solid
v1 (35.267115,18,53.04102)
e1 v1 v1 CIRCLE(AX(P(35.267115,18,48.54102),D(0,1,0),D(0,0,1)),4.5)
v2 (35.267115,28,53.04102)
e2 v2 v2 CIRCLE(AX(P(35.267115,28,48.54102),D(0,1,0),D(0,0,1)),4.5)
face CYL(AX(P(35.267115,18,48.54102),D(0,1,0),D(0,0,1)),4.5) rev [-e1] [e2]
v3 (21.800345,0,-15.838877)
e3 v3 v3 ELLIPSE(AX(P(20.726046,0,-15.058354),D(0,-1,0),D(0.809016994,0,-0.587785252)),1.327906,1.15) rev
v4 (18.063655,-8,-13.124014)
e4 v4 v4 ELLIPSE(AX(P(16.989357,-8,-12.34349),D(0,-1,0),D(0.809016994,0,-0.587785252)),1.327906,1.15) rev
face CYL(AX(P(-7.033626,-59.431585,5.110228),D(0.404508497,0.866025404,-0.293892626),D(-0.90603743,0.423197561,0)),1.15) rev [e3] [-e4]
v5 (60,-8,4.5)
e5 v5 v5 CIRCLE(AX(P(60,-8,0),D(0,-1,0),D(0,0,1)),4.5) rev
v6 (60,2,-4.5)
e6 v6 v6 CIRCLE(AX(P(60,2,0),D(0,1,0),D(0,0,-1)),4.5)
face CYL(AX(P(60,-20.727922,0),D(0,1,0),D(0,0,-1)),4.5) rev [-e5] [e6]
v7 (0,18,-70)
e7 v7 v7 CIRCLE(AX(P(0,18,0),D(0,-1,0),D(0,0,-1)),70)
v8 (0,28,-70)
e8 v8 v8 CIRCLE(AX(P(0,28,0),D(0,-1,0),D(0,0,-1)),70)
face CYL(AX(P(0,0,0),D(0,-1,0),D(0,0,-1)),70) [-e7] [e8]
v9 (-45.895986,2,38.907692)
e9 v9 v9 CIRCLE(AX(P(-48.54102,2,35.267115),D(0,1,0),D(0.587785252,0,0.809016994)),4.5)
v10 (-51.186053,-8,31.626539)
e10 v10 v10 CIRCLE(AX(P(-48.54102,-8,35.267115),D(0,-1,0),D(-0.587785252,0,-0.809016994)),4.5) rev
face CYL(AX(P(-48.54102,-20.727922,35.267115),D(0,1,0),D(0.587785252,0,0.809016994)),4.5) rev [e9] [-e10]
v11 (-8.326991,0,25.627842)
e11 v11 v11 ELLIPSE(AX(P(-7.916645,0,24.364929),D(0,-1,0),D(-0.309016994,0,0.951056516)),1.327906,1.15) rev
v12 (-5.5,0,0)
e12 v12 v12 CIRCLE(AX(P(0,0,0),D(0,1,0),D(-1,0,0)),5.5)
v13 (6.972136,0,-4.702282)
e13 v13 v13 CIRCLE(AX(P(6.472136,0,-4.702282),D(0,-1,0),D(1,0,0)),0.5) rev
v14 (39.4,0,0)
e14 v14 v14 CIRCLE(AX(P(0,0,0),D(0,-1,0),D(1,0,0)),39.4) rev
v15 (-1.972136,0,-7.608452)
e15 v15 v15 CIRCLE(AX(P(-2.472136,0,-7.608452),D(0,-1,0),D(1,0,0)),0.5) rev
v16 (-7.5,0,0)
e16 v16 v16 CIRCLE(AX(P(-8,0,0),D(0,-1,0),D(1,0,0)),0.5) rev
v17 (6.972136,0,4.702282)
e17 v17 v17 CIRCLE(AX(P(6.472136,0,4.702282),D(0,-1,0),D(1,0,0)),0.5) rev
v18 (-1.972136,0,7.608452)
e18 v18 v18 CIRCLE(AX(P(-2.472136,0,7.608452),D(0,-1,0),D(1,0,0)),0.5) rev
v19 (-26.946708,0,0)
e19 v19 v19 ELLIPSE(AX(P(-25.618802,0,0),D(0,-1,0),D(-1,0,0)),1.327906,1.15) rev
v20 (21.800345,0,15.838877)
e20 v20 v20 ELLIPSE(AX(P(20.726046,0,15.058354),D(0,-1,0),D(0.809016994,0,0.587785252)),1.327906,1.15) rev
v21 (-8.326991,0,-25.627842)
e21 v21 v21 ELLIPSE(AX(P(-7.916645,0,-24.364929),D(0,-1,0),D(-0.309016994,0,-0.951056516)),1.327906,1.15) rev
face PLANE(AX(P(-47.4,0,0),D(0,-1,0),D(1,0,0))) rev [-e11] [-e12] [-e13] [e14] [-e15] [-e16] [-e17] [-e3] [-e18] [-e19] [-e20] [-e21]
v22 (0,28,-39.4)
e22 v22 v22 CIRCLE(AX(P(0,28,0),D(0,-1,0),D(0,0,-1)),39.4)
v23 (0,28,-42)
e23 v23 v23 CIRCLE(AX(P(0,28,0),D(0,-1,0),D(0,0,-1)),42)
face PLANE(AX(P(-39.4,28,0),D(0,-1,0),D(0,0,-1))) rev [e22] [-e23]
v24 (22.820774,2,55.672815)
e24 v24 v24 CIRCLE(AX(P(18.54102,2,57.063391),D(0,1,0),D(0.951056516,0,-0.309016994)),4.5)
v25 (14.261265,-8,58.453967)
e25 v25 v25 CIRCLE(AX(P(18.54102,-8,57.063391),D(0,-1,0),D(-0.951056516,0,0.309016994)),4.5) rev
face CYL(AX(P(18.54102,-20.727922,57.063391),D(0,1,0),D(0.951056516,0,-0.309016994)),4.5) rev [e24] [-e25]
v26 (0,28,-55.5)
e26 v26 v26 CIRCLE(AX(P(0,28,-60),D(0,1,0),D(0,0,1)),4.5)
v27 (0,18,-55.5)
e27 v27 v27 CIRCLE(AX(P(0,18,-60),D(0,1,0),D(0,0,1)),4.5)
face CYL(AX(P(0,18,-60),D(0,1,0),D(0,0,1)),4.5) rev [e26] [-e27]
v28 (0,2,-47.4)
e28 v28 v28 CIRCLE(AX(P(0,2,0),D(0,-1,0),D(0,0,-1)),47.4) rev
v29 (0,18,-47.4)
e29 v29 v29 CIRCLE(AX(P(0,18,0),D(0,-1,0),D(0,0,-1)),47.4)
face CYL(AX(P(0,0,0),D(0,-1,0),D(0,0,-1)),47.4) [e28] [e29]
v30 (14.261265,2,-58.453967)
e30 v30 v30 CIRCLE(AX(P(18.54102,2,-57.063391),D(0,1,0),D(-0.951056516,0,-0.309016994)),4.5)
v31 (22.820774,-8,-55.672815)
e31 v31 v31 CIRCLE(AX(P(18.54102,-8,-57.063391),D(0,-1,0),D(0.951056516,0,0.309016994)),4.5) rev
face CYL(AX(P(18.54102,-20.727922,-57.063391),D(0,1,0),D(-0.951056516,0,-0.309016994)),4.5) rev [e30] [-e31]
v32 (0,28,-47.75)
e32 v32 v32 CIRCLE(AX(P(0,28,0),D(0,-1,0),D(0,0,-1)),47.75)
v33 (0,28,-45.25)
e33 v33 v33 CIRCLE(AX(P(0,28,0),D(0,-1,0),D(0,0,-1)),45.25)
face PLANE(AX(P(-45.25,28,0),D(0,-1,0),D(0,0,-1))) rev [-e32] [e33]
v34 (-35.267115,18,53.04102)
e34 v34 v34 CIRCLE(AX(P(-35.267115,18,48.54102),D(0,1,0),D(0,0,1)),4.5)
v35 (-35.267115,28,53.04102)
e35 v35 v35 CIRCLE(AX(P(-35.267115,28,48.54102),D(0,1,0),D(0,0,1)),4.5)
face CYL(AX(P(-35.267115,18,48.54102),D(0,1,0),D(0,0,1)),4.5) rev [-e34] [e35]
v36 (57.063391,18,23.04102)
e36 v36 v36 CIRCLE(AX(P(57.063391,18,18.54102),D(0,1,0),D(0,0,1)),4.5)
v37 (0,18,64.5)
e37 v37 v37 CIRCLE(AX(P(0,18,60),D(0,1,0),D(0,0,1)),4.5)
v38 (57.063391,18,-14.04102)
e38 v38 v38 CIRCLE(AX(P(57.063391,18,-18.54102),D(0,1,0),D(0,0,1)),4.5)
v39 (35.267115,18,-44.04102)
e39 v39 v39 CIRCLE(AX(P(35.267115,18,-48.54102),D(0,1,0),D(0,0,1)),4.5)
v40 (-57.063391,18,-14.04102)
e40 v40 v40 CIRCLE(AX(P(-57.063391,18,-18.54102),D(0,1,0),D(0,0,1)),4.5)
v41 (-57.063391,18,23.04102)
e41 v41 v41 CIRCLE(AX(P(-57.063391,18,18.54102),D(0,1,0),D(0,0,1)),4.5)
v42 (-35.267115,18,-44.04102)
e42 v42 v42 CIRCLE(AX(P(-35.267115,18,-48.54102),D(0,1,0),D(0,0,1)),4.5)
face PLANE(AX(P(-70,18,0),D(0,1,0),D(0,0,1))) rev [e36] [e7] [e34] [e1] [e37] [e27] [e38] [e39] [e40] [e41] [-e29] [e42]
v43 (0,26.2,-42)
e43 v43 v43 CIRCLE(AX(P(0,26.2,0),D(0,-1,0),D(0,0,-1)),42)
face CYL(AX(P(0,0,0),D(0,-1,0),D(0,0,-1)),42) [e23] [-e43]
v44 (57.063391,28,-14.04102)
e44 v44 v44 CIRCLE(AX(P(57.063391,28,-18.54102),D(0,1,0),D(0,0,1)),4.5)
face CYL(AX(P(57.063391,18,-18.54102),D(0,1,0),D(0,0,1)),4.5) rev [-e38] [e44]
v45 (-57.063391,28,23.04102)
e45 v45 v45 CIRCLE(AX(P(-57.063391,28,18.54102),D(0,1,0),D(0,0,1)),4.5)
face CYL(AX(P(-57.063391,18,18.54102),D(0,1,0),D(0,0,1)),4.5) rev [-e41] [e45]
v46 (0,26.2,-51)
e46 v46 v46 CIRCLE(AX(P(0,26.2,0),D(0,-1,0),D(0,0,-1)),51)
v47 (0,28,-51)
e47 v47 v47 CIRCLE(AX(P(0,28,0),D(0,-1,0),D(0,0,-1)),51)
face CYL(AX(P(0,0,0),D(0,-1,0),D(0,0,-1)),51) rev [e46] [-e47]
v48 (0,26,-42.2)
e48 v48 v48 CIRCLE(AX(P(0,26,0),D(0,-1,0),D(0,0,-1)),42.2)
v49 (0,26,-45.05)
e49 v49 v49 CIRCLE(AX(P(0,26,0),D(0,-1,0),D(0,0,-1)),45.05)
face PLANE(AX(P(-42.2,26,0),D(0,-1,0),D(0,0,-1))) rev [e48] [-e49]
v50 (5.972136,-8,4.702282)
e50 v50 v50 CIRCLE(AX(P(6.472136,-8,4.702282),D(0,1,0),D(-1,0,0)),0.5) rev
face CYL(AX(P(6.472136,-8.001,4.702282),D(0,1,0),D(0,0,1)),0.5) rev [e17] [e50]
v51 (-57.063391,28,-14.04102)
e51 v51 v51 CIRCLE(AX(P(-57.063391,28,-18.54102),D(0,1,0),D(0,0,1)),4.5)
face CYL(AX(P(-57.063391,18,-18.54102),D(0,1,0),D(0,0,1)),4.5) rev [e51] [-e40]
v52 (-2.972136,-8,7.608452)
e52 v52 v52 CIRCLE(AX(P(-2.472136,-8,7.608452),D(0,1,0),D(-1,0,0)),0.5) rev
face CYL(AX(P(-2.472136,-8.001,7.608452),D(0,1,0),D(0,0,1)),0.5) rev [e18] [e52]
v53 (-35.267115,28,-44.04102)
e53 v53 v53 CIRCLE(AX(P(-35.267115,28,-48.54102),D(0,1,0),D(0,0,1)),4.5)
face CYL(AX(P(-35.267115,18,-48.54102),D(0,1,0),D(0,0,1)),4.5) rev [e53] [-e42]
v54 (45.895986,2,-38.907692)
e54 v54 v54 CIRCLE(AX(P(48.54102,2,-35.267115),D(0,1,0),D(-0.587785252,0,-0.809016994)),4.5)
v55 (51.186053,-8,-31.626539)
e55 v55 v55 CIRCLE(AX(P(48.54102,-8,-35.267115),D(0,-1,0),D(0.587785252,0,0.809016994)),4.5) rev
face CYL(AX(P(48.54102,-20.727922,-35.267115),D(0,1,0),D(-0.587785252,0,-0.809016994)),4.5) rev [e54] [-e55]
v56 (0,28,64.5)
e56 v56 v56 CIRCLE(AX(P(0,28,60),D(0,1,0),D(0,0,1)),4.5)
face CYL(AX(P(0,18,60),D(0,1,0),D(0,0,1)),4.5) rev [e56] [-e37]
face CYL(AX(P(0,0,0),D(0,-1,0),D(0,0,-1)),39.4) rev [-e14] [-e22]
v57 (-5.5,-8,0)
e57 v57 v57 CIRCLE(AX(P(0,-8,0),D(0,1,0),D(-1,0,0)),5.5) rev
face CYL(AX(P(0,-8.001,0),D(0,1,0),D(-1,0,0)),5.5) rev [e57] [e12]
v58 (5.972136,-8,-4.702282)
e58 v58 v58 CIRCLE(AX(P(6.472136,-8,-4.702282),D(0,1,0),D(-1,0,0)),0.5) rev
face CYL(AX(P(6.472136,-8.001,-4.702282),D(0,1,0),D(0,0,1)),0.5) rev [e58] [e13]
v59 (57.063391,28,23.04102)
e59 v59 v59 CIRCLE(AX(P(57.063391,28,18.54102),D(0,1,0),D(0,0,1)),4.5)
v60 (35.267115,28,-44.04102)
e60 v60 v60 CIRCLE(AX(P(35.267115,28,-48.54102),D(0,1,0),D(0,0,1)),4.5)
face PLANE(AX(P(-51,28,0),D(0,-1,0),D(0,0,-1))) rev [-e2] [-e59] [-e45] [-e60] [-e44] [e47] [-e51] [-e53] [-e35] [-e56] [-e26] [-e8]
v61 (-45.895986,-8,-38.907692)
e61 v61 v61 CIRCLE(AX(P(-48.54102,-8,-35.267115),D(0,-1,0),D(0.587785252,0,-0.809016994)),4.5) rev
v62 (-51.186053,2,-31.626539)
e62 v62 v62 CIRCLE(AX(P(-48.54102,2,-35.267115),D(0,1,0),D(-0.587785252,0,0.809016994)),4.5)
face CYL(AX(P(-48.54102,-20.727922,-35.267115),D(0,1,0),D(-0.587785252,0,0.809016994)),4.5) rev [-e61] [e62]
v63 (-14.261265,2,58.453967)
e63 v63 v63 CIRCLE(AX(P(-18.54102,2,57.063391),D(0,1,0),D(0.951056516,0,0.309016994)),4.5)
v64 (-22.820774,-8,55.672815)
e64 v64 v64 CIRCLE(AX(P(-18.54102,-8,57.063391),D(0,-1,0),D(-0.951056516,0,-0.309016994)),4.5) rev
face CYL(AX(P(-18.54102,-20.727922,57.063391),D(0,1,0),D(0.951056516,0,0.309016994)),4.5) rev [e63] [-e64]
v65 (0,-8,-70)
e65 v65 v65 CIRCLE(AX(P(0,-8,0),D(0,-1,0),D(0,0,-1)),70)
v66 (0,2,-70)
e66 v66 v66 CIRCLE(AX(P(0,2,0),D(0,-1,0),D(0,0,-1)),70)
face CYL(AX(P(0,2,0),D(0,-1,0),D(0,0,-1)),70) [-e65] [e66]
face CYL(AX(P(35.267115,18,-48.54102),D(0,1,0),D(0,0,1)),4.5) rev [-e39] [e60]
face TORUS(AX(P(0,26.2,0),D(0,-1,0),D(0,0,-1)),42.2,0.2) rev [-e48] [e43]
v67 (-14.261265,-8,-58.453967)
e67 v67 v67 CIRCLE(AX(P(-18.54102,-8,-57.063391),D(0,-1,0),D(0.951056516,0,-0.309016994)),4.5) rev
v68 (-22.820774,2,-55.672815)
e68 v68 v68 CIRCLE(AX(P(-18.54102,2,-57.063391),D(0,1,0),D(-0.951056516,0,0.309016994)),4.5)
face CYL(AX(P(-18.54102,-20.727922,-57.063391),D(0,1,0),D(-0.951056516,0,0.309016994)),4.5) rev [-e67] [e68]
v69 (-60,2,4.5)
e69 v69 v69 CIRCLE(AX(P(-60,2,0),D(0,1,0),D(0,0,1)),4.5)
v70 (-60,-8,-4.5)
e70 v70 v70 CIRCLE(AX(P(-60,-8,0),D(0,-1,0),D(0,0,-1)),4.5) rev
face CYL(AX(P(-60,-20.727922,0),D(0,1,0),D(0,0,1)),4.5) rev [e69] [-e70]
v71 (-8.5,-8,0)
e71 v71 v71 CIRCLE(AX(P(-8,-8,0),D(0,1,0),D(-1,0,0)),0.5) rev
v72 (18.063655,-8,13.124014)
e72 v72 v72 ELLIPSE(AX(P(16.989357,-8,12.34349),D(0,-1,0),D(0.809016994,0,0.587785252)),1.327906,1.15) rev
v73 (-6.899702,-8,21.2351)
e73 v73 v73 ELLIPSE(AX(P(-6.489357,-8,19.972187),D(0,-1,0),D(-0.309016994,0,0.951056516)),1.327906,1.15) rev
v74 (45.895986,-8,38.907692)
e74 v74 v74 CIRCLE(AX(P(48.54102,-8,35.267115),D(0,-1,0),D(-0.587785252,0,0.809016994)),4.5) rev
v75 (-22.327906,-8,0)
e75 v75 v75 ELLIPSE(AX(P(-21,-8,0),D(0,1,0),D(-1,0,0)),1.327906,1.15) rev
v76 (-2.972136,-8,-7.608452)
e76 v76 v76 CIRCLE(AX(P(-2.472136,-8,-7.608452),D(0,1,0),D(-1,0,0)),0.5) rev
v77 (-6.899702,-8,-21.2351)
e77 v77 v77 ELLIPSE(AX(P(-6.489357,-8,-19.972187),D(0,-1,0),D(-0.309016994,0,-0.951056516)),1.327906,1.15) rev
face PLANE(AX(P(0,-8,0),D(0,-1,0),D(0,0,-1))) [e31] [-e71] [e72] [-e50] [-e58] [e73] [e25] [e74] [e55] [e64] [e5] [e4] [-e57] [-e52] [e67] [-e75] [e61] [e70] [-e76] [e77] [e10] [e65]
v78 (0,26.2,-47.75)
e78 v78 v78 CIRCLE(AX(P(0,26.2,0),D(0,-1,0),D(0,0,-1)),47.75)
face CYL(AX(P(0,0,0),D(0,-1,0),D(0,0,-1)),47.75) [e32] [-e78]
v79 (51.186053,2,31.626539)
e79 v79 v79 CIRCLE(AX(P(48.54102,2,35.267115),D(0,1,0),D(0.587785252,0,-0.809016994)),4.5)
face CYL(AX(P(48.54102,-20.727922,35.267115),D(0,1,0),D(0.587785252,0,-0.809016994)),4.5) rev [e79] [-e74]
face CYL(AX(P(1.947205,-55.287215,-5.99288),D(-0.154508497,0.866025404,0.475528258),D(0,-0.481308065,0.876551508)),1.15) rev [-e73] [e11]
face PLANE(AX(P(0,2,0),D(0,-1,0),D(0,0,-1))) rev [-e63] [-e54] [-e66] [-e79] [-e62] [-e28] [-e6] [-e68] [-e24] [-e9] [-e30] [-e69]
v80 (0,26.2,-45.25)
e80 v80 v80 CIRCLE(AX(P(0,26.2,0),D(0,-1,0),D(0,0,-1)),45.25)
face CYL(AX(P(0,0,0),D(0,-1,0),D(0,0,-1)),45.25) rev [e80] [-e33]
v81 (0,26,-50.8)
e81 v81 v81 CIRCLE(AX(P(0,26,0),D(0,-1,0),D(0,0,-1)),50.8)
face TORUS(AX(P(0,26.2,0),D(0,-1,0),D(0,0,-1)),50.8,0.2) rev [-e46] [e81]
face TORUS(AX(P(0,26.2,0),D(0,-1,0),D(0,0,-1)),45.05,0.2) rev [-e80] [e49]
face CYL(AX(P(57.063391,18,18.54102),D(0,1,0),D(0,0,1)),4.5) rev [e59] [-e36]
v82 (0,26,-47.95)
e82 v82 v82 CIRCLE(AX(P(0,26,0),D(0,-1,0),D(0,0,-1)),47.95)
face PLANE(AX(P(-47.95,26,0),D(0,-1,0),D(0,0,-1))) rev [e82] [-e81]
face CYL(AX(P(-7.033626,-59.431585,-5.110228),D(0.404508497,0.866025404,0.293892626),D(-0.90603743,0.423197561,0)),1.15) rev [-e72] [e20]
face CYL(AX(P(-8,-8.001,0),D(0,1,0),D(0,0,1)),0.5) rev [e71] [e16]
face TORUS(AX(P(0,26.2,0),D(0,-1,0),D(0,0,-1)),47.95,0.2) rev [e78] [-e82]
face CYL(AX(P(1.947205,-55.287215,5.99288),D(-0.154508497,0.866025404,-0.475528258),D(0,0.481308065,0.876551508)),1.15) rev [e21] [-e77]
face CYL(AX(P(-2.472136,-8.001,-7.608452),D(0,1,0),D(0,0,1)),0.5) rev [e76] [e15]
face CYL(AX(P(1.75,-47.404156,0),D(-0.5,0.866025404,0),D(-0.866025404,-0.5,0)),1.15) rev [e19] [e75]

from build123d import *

# Parameters (mm, degrees)
FUEL_START                = -8
SKETCH2_R                 = 0.5
FUEL_HOLES_DEPTH          = 8
CIRPATTERN1_COUNT         = 5
SKETCH19_R                = 70
SKETCH19_R_2              = 47.4
BOSS_EXTRUDE2_DEPTH       = 10
SKETCH19_3_R              = 4
BOLT_HOLES_DEPTH          = 10
CUT_EXTRUDE7_START        = -10
SKETCH41_R                = 1.15
CUT_EXTRUDE7_DEPTH        = 111.877528587
SKETCH32_R                = 5.5
CUT_EXTRUDE3_DEPTH        = 8
CIRPATTERN6_START         = -8
CIRPATTERN6_OUTLINE_R     = 4
CIRPATTERN6_DEPTH         = 10
CIRPATTERN6_2_OUTLINE_R   = 70
CIRPATTERN6_2_OUTLINE_R_2 = 47.4
CIRPATTERN6_2_DEPTH       = 10
SKETCH33_R                = 4.5
CUT_EXTRUDE5_DEPTH        = 10
CIRPATTERN8_COUNT         = 10
SKETCH36_R                = 4.5
CUT_EXTRUDE6_DEPTH        = 10
CIRPATTERN9_COUNT         = 5


# Read off the part's stored shape, not the designer's step: CirPattern6
with BuildPart() as part:
    # Sketch1 → Revolve1 (revolve)
    with BuildSketch(Plane.XY, mode=Mode.PRIVATE) as revolve1_sk:
        Polygon((-47.4, 0), (-47.4, -8), (-17.4, -8), (-7, -8), (0, -8), (0, 0), align=None)
    revolve(revolve1_sk.sketch.rotate(Axis((0, -8, 0), (0, 1, 0)), 180), axis=Axis((0, -8, 0), (0, 1, 0)))

    # Sketch2 → Fuel holes (cut)
    with BuildSketch(Plane(origin=(0, 0, 0), x_dir=(1, 0, 0), z_dir=(0, 1, 0)).offset(FUEL_START)):
        with Locations(Location((-8, 0, 0), (0, 0, 180))):
            Circle(SKETCH2_R)
    fuel_holes = extrude(amount=FUEL_HOLES_DEPTH, mode=Mode.SUBTRACT)

    # CirPattern1: Fuel holes ×5 about axis
    cirpattern1_axis = Axis((0, 0, 0), (0, 1, 0))
    for i in range(1, CIRPATTERN1_COUNT):
        add(fuel_holes.rotate(cirpattern1_axis, i * 360 / CIRPATTERN1_COUNT), mode=Mode.SUBTRACT)

    # Sketch41 → Cut-Extrude7 (cut)
    with BuildSketch(Plane(origin=(-1.785898385, 3.09326674, 0), x_dir=(0, 0, -1), z_dir=(0.499999999999998, -0.8660254037844398, 0)).offset(CUT_EXTRUDE7_START)):
        with Locations(Location((0, -22.186533479, 0), (0, 0, 270))):
            Circle(SKETCH41_R)
    cut_extrude7 = extrude(amount=CUT_EXTRUDE7_DEPTH, mode=Mode.SUBTRACT)

    # Sketch32 → Cut-Extrude3 (cut)
    with BuildSketch(Plane(origin=(0, 0, 0), x_dir=(1, 0, 0), z_dir=(0, 1, 0))):
        with Locations(Location((0, 0, 0), (0, 0, 180))):
            Circle(SKETCH32_R)
    extrude(amount=-CUT_EXTRUDE3_DEPTH, mode=Mode.SUBTRACT)

    # CirPattern6 2 outline → CirPattern6 2 (add)
    with BuildSketch(Plane(origin=(0, 0, 0), x_dir=(1, 0, 0), z_dir=(0, 1, 0)).offset(CIRPATTERN6_START)):
        Circle(CIRPATTERN6_2_OUTLINE_R)
        Circle(CIRPATTERN6_2_OUTLINE_R_2, mode=Mode.SUBTRACT)
    extrude(amount=CIRPATTERN6_2_DEPTH)


with BuildPart() as body_2:
    # Sketch19 → Boss-Extrude2 (new body)
    with BuildSketch(Plane.XZ.offset(8)):
        with Locations(Location((0, 0, 0), (0, 0, 270))):
            Circle(SKETCH19_R)
        with Locations(Location((0, 0, 0), (0, 0, 270))):
            Circle(SKETCH19_R_2, mode=Mode.SUBTRACT)
    extrude(amount=-BOSS_EXTRUDE2_DEPTH)

    # Sketch19<3> → Bolt holes (cut)
    with BuildSketch(Plane.XZ.offset(8)):
        with Locations(Location((-60, 0, 0), (0, 0, 270))):
            Circle(SKETCH19_3_R)
    extrude(amount=-BOLT_HOLES_DEPTH, mode=Mode.SUBTRACT)

    # CirPattern6 outline → CirPattern6 (add)
    with BuildSketch(Plane(origin=(0, 0, 0), x_dir=(1, 0, 0), z_dir=(0, 1, 0)).offset(CIRPATTERN6_START)):
        with Locations((-60, 0)):
            Circle(CIRPATTERN6_OUTLINE_R)
    extrude(amount=CIRPATTERN6_DEPTH)


with BuildPart() as cut_extrude5_tool:
    # Sketch33 → Cut-Extrude5 (new body)
    with BuildSketch(Plane(origin=(0, 2, 0), x_dir=(1, 0, 0), z_dir=(0, 1, 0))):
        with Locations(Location((-60, 0, 0), (0, 0, 270))):
            Circle(SKETCH33_R)
    cut_extrude5 = extrude(amount=-CUT_EXTRUDE5_DEPTH)


with BuildPart() as part_1:
    add(part.part)

    # Cut-Extrude5: cut by cut_extrude5_tool
    add(cut_extrude5_tool.part, mode=Mode.SUBTRACT)


with BuildPart() as body_2_1:
    add(body_2.part)

    # Cut-Extrude5: cut by cut_extrude5_tool
    add(cut_extrude5_tool.part, mode=Mode.SUBTRACT)


with BuildPart() as cirpattern8_tool:
    # CirPattern8: Cut-Extrude5 ×10 about axis
    cirpattern8_axis = Axis((0, 0, 0), (0, 1, 0))
    for i in range(1, CIRPATTERN8_COUNT):
        add(cut_extrude5.rotate(cirpattern8_axis, i * 360 / CIRPATTERN8_COUNT))


with BuildPart() as part_2:
    add(part_1.part)

    # CirPattern8: cut by cirpattern8_tool
    add(cirpattern8_tool.part, mode=Mode.SUBTRACT)



with BuildPart() as body_2_2:
    add(body_2_1.part)

    # CirPattern8: cut by cirpattern8_tool
    add(cirpattern8_tool.part, mode=Mode.SUBTRACT)


with BuildPart() as part_3:
    add(part_2.part)

    add(body_2_2.part)  # Revolve2 merges body 2
    # Sketch34 → Revolve2 (revolve)
    with BuildSketch(Plane.XY, mode=Mode.PRIVATE) as revolve2_sk:
        with BuildLine():
            Line((-47.4, 0), (-39.4, 0))
            Line((-39.4, 0), (-39.4, 28))
            Line((-39.4, 28), (-42, 28))
            Line((-42, 28), (-42, 26.2))
            ThreePointArc((-42, 26.2), (-42.058578644, 26.058578644), (-42.2, 26))
            Line((-42.2, 26), (-45.05, 26))
            ThreePointArc((-45.05, 26), (-45.191421356, 26.058578644), (-45.25, 26.2))
            Line((-45.25, 26.2), (-45.25, 28))
            Line((-45.25, 28), (-47.75, 28))
            Line((-47.75, 28), (-47.75, 26.2))
            ThreePointArc((-47.75, 26.2), (-47.808578644, 26.058578644), (-47.95, 26))
            Line((-47.95, 26), (-50.8, 26))
            ThreePointArc((-50.8, 26), (-50.941421356, 26.058578644), (-51, 26.2))
            Line((-51, 26.2), (-51, 28))
            Line((-51, 28), (-70, 28))
            Line((-70, 28), (-70, 18))
            Line((-70, 18), (-47.4, 18))
            Line((-47.4, 18), (-47.4, 0))
        make_face()
    revolve(revolve2_sk.sketch.rotate(Axis((0, 0, 0), (0, 1, 0)), 270), axis=Axis((0, 0, 0), (0, 1, 0)))

    # Sketch36 → Cut-Extrude6 (cut)
    with BuildSketch(Plane(origin=(0, 28, 0), x_dir=(1, 0, 0), z_dir=(0, 1, 0))):
        with Locations(Location((35.267115138, 48.541019663, 0), (0, 0, 270))):
            Circle(SKETCH36_R)
        with Locations(Location((-35.267115138, 48.541019662, 0), (0, 0, 270))):
            Circle(SKETCH36_R)
        with Locations(Location((0, 60, 0), (0, 0, 270))):
            Circle(SKETCH36_R)
        with Locations(Location((-57.063390978, 18.541019662, 0), (0, 0, 270))):
            Circle(SKETCH36_R)
        with Locations(Location((-57.063390978, -18.541019663, 0), (0, 0, 270))):
            Circle(SKETCH36_R)
        with Locations(Location((57.063390978, 18.541019663, 0), (0, 0, 270))):
            Circle(SKETCH36_R)
        with Locations(Location((57.063390978, -18.541019662, 0), (0, 0, 270))):
            Circle(SKETCH36_R)
        with Locations(Location((35.267115138, -48.541019662, 0), (0, 0, 270))):
            Circle(SKETCH36_R)
        with Locations(Location((0, -60, 0), (0, 0, 270))):
            Circle(SKETCH36_R)
        with Locations(Location((-35.267115138, -48.541019663, 0), (0, 0, 270))):
            Circle(SKETCH36_R)
    extrude(amount=-CUT_EXTRUDE6_DEPTH, mode=Mode.SUBTRACT)

    # CirPattern9: Cut-Extrude7 ×5 about axis
    cirpattern9_axis = Axis((0, 0, 0), (0, 1, 0))
    for i in range(1, CIRPATTERN9_COUNT):
        add(cut_extrude7.rotate(cirpattern9_axis, i * 360 / CIRPATTERN9_COUNT), mode=Mode.SUBTRACT)


solid = part_3.part
